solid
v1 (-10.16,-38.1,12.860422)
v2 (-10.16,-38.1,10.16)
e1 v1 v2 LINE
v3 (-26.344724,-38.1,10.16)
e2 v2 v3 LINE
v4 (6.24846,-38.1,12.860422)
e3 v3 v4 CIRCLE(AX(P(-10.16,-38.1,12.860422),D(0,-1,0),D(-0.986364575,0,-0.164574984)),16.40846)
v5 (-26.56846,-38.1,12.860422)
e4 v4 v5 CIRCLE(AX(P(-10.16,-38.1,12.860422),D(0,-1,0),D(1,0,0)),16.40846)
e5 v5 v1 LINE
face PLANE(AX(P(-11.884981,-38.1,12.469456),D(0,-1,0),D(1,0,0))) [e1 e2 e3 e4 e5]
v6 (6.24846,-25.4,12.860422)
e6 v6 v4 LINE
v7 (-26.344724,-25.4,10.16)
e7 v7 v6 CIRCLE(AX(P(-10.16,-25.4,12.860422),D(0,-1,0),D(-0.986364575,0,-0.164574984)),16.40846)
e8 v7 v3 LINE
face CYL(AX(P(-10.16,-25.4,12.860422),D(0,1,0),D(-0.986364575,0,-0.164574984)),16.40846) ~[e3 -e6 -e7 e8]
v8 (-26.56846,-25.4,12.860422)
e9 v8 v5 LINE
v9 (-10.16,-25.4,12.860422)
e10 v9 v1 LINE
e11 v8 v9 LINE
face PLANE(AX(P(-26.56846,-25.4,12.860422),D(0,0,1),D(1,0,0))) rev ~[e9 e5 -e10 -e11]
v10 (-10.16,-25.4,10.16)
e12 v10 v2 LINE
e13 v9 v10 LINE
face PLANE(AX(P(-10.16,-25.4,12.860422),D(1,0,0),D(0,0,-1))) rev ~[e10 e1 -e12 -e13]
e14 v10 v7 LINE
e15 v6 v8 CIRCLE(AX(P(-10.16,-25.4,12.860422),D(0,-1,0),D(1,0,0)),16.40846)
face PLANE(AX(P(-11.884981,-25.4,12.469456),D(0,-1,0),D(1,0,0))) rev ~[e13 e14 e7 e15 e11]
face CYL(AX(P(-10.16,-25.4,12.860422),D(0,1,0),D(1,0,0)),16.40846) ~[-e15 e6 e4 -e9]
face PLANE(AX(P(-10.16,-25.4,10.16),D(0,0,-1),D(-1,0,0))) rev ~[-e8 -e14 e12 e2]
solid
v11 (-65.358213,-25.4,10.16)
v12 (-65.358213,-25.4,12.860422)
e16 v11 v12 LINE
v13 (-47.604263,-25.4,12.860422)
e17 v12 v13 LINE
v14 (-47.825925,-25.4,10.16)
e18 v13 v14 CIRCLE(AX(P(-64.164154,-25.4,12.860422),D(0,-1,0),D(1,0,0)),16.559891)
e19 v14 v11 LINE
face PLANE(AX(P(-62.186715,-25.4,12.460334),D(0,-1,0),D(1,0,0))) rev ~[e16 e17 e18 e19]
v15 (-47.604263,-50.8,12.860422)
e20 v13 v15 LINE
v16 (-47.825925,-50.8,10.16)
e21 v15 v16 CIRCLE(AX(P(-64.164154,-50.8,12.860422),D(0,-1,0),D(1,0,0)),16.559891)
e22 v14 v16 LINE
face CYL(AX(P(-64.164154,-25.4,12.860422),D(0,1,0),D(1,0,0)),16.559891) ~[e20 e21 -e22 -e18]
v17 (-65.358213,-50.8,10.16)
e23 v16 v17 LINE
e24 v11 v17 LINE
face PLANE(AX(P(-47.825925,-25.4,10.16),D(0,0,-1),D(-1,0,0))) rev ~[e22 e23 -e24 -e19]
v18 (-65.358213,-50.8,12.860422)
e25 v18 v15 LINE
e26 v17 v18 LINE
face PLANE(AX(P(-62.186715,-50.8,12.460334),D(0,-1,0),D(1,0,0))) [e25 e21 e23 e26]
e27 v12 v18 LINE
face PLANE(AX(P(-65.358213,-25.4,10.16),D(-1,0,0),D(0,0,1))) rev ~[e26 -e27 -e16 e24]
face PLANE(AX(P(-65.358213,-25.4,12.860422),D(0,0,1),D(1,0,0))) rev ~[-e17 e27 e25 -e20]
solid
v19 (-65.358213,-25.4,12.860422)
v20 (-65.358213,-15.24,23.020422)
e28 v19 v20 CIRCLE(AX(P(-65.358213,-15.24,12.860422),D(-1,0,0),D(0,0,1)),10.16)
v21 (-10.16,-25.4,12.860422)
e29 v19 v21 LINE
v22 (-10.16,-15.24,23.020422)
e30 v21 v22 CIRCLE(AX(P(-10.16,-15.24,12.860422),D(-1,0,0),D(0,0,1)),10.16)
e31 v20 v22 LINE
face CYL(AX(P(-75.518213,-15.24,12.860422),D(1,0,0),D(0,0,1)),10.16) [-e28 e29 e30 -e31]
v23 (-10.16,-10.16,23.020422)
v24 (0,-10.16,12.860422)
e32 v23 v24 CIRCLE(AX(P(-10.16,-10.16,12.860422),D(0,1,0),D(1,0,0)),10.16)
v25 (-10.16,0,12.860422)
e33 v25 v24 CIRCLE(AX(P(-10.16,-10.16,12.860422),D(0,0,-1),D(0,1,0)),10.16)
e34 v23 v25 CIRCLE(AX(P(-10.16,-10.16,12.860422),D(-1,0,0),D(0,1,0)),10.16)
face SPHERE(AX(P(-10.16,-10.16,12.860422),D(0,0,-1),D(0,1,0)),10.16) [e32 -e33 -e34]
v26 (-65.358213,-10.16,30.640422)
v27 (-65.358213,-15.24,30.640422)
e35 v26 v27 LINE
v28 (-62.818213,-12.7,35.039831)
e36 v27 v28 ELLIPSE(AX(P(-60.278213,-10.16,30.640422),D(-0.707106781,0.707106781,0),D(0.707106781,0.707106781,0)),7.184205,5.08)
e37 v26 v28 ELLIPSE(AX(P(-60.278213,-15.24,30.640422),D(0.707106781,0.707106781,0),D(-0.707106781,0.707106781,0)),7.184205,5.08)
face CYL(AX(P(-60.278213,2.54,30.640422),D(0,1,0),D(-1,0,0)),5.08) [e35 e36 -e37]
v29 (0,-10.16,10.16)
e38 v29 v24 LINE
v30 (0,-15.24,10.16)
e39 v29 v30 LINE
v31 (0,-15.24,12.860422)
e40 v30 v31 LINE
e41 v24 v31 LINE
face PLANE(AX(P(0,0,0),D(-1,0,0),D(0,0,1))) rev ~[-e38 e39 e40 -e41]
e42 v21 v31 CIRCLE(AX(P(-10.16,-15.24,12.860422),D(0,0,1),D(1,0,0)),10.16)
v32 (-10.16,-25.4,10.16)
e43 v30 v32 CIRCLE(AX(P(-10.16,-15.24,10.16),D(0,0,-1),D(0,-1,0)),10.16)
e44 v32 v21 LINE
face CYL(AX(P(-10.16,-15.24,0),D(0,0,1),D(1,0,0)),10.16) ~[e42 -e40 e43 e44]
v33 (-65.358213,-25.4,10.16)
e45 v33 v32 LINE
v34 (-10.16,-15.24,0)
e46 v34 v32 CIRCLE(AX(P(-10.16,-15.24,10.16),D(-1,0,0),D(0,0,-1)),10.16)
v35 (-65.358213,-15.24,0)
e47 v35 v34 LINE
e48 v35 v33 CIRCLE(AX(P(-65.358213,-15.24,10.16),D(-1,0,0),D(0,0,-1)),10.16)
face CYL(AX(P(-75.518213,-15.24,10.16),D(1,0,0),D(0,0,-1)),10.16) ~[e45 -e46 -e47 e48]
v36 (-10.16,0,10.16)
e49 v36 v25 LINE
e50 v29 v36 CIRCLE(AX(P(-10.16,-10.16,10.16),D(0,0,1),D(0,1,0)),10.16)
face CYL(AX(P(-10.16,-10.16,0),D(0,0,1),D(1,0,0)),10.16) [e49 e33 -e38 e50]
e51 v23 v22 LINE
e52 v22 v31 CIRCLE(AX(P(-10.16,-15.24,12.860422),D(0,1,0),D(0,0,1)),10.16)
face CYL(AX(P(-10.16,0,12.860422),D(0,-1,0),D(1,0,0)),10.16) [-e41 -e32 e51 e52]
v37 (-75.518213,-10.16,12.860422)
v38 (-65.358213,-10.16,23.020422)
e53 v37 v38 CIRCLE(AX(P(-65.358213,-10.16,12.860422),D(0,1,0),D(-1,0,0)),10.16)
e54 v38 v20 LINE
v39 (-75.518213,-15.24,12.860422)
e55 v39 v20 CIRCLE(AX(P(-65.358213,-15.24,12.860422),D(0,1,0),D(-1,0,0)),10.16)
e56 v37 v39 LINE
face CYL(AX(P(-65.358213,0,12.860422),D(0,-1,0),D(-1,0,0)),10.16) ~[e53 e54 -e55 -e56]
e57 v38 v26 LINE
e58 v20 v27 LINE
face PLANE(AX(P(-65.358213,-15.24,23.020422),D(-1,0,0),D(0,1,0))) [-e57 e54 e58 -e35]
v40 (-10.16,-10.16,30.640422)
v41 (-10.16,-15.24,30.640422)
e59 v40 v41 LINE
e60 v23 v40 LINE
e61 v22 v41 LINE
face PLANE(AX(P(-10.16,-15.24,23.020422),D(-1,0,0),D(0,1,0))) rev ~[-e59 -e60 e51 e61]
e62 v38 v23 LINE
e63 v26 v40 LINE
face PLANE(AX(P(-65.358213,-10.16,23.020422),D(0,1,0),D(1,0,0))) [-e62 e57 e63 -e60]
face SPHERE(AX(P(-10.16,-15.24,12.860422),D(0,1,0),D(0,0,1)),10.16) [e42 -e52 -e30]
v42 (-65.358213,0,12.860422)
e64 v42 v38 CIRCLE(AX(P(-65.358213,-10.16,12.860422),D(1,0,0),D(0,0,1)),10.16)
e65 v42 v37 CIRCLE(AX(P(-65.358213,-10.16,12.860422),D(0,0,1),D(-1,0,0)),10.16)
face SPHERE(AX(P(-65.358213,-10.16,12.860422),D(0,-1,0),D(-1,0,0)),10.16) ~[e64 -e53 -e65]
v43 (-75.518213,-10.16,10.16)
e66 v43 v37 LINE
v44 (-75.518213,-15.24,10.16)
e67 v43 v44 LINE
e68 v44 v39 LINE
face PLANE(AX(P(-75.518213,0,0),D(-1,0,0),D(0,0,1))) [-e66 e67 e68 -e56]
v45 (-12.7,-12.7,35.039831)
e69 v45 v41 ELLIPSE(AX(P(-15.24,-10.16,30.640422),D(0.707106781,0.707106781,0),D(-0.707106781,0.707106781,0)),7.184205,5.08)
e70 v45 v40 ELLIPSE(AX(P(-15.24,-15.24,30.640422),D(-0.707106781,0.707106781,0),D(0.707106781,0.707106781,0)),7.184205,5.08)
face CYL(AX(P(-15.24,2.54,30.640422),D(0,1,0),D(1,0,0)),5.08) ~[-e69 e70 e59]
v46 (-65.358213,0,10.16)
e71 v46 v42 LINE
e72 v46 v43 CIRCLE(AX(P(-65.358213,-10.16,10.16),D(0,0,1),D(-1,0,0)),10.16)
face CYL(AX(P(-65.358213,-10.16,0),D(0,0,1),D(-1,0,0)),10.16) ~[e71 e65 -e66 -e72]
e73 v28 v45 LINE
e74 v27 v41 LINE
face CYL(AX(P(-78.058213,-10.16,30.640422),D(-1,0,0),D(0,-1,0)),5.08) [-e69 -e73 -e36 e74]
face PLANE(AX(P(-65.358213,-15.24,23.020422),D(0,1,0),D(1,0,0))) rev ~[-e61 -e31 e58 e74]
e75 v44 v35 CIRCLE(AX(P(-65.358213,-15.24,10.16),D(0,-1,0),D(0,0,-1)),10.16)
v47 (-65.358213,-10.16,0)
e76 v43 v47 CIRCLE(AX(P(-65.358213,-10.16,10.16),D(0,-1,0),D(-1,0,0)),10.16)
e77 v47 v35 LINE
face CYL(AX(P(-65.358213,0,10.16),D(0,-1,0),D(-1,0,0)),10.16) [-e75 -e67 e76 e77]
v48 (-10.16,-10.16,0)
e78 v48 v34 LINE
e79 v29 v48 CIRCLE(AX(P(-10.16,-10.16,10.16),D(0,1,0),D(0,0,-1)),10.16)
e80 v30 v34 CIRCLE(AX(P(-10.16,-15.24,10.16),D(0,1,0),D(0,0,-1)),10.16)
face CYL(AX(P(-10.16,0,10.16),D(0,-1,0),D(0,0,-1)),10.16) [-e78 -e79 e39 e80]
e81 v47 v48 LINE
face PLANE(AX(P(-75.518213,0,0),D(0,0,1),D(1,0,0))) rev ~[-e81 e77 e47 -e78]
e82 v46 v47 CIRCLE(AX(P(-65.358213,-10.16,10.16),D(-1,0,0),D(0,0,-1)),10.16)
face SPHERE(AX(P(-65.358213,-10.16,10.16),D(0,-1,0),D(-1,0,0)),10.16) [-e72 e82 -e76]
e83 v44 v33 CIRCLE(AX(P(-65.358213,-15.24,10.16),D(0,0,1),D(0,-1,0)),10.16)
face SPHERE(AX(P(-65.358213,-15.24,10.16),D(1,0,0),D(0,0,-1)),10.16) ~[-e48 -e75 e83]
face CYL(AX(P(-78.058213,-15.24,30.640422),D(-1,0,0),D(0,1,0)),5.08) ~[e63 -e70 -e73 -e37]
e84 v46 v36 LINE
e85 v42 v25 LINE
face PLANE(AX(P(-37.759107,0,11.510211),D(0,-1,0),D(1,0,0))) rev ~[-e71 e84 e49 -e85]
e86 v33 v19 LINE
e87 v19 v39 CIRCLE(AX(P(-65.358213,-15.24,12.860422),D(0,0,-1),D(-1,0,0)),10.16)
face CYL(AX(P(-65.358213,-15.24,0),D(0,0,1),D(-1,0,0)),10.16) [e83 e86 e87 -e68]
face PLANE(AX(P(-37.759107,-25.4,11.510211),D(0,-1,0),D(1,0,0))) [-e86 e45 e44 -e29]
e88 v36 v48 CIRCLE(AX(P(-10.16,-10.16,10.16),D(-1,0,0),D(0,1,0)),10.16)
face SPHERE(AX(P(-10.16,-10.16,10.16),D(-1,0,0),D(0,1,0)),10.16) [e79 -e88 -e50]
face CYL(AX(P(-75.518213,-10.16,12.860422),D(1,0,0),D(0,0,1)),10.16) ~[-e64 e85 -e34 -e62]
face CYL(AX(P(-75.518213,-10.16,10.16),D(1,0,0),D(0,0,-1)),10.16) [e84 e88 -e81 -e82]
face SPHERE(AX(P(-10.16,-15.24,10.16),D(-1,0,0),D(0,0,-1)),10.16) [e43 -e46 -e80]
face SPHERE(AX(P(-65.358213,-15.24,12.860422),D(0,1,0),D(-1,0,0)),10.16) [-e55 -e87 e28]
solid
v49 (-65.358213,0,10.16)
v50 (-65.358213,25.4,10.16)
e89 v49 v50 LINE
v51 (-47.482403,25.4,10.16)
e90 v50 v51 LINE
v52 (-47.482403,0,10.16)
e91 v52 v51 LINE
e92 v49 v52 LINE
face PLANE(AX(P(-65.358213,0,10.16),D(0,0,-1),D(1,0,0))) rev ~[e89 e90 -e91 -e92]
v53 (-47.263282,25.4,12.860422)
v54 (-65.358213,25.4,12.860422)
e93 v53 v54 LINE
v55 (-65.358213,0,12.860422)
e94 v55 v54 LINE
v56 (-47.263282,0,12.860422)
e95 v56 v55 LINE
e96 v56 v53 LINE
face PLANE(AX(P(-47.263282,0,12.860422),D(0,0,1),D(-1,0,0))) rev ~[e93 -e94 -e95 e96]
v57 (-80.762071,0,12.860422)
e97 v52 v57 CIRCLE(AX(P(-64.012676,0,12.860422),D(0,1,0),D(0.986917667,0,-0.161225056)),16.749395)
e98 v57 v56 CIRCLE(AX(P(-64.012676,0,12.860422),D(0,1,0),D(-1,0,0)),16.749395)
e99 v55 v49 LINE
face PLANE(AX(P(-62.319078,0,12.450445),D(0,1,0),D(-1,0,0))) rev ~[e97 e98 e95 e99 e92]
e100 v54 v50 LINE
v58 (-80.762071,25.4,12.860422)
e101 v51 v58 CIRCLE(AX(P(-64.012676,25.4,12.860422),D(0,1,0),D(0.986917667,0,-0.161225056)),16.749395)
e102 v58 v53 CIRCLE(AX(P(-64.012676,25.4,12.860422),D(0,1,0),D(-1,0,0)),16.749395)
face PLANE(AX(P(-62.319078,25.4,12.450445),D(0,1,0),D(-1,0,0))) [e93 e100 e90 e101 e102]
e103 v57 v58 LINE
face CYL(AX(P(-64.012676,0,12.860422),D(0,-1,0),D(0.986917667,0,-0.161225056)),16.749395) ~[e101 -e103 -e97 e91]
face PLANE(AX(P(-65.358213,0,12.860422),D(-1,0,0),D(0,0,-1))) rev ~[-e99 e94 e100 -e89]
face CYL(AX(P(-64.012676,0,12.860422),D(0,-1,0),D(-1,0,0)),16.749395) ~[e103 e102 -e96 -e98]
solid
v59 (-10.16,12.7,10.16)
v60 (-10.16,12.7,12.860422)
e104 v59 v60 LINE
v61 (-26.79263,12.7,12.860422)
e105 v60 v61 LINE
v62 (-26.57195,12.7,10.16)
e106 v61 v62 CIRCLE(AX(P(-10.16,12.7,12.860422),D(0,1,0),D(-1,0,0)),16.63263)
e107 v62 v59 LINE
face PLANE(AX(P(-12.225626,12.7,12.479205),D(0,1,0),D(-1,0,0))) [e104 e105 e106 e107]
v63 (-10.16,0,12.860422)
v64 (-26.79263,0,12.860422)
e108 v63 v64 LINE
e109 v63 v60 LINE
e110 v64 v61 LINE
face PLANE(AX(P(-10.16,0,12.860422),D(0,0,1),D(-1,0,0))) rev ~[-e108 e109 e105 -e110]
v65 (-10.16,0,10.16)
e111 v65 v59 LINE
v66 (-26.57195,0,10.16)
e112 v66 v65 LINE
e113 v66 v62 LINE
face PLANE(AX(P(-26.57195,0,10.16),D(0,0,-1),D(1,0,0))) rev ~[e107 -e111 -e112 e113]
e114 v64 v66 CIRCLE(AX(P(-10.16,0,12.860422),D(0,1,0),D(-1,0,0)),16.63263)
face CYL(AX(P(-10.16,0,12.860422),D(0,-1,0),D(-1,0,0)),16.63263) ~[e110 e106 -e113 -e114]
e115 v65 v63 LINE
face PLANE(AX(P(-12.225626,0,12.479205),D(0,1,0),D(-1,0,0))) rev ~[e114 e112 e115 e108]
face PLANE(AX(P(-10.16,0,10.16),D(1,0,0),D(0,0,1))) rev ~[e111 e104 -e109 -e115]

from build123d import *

# Parameters (mm, degrees)
F0_W         = 75.5182132125
F0_H         = 23.0204220861
F1_DEPTH     = 25.4
F2_R         = 10.16
F5_DEPTH     = 25.4
F6_DEPTH     = 25.4
F7_DEPTH     = 12.7
F8_DEPTH     = 12.7
F9_W         = 55.1982132125
F9_H         = 5.08
F10_DEPTH    = 12.7
F11_T1_DEPTH = 30.48
F11_T3_DEPTH = 80.5982132125


# Not quite as in the source:
# - a fillet or chamfer that OpenCascade refuses, or shapes differently, is made with other operations: its cross-section is extruded or revolved along the edge and cut away or added


with BuildPart() as f1:
    # F0 (on Front) → F1 (new body)
    with BuildSketch(Plane.XZ):
        with Locations((-37.7591066062, 11.5102110431)):
            Rectangle(F0_W, F0_H)
    extrude(amount=F1_DEPTH)

    # F2
    f2_edges = [f1.edges().sort_by_distance(p)[0] for p in [
        (-37.759107, -25.4, 0),
        (-75.518213, -12.7, 23.020422),
        (-75.518213, -12.7, 0),
        (-75.518213, 0, 11.510211),
        (-75.518213, -25.4, 11.510211),
        (-37.759107, 0, 0),
        (0, 0, 11.510211),
        (-37.759107, 0, 23.020422),
        (0, -12.7, 23.020422),
        (-37.759107, -25.4, 23.020422),
        (0, -12.7, 0),
        (0, -25.4, 11.510211),
    ]]
    fillet(f2_edges, radius=F2_R)

    # F9 (on face) → F10 (join)
    with BuildSketch(Plane.XY.offset(23.0204220861)):
        with Locations((-37.7591066062, -12.7)):
            Rectangle(F9_W, F9_H)
    extrude(amount=F10_DEPTH)

    # F11: fillet of radius 5.08 on 4 edges, made by hand

    # F11_s2 → F11_t1 (cut)
    with BuildSketch(Plane.XZ.offset(-2.54)):
        with BuildLine():
            ThreePointArc((-10.16, 30.6404220861), (-11.6478975516, 34.2325245345), (-15.24, 35.7204220861))
            Line((-15.24, 35.7204220861), (-10.16, 35.7204220861))
            Line((-10.16, 35.7204220861), (-10.16, 30.6404220861))
        make_face()
        with BuildLine():
            ThreePointArc((-65.3582132125, 30.6404220861), (-63.8703156609, 34.2325245345), (-60.2782132125, 35.7204220861))
            Line((-60.2782132125, 35.7204220861), (-65.3582132125, 35.7204220861))
            Line((-65.3582132125, 35.7204220861), (-65.3582132125, 30.6404220861))
        make_face()
    extrude(amount=F11_T1_DEPTH, mode=Mode.SUBTRACT)

    # F11_s4 → F11_t3 (cut)
    with BuildSketch(Plane.YZ.offset(-78.0582132125)):
        with BuildLine():
            ThreePointArc((-10.16, 30.6404220861), (-11.6478975516, 34.2325245345), (-15.24, 35.7204220861))
            Line((-15.24, 35.7204220861), (-10.16, 35.7204220861))
            Line((-10.16, 35.7204220861), (-10.16, 30.6404220861))
        make_face()
        with BuildLine():
            ThreePointArc((-15.24, 30.6404220861), (-13.7521024484, 34.2325245345), (-10.16, 35.7204220861))
            Line((-10.16, 35.7204220861), (-15.24, 35.7204220861))
            Line((-15.24, 35.7204220861), (-15.24, 30.6404220861))
        make_face()
    extrude(amount=F11_T3_DEPTH, mode=Mode.SUBTRACT)


with BuildPart() as f5:
    # F4 (on face) → F5 (new body)
    with BuildSketch(Plane.XZ.offset(25.4)):
        with BuildLine():
            Line((-65.3582132125, 12.8604220861), (-47.6042628759, 12.8604220861))
            ThreePointArc((-47.6042628759, 12.8604220861), (-80.6685369308, 14.2151742503), (-47.825925372, 10.16))
            Line((-47.825925372, 10.16), (-65.3582132125, 10.16))
            Line((-65.3582132125, 10.16), (-65.3582132125, 12.8604220861))
        make_face()
    extrude(amount=F5_DEPTH)


with BuildPart() as f6:
    # F3 (on face) → F6 (new body)
    with BuildSketch(Plane(origin=(0, 0, 0), x_dir=(-1, 0, 0), z_dir=(0, 1, 0))):
        with BuildLine():
            ThreePointArc((47.4824030652, 10.16), (65.3673252812, -3.83410232), (80.7620710494, 12.8604220861))
            ThreePointArc((80.7620710494, 12.8604220861), (64.0126764774, 29.6098166581), (47.2632819055, 12.8604220861))
            Line((47.2632819055, 12.8604220861), (65.3582132125, 12.8604220861))
            Line((65.3582132125, 12.8604220861), (65.3582132125, 10.16))
            Line((65.3582132125, 10.16), (47.4824030652, 10.16))
        make_face()
    extrude(amount=F6_DEPTH)


with BuildPart() as f7:
    # F4 (on face) → F7 (new body)
    with BuildSketch(Plane.XZ.offset(25.4)):
        with BuildLine():
            ThreePointArc((6.2484602862, 12.8604220861), (-10.16, 29.2688823724), (-26.5684602862, 12.8604220861))
            Line((-26.5684602862, 12.8604220861), (-10.16, 12.8604220861))
            Line((-10.16, 12.8604220861), (-10.16, 10.16))
            Line((-10.16, 10.16), (-26.3447239557, 10.16))
            ThreePointArc((-26.3447239557, 10.16), (-8.8051626123, -3.4920084555), (6.2484602862, 12.8604220861))
        make_face()
    extrude(amount=F7_DEPTH)


with BuildPart() as f8:
    # F3 (on face) → F8 (new body)
    with BuildSketch(Plane(origin=(0, 0, 0), x_dir=(-1, 0, 0), z_dir=(0, 1, 0))):
        with BuildLine():
            Line((10.16, 12.8604220861), (26.7926303068, 12.8604220861))
            ThreePointArc((26.7926303068, 12.8604220861), (-6.4173684927, 14.2151341519), (26.5719502644, 10.16))
            Line((26.5719502644, 10.16), (10.16, 10.16))
            Line((10.16, 10.16), (10.16, 12.8604220861))
        make_face()
    extrude(amount=F8_DEPTH)


solid = Compound([f1.part, f5.part, f6.part, f7.part, f8.part])
